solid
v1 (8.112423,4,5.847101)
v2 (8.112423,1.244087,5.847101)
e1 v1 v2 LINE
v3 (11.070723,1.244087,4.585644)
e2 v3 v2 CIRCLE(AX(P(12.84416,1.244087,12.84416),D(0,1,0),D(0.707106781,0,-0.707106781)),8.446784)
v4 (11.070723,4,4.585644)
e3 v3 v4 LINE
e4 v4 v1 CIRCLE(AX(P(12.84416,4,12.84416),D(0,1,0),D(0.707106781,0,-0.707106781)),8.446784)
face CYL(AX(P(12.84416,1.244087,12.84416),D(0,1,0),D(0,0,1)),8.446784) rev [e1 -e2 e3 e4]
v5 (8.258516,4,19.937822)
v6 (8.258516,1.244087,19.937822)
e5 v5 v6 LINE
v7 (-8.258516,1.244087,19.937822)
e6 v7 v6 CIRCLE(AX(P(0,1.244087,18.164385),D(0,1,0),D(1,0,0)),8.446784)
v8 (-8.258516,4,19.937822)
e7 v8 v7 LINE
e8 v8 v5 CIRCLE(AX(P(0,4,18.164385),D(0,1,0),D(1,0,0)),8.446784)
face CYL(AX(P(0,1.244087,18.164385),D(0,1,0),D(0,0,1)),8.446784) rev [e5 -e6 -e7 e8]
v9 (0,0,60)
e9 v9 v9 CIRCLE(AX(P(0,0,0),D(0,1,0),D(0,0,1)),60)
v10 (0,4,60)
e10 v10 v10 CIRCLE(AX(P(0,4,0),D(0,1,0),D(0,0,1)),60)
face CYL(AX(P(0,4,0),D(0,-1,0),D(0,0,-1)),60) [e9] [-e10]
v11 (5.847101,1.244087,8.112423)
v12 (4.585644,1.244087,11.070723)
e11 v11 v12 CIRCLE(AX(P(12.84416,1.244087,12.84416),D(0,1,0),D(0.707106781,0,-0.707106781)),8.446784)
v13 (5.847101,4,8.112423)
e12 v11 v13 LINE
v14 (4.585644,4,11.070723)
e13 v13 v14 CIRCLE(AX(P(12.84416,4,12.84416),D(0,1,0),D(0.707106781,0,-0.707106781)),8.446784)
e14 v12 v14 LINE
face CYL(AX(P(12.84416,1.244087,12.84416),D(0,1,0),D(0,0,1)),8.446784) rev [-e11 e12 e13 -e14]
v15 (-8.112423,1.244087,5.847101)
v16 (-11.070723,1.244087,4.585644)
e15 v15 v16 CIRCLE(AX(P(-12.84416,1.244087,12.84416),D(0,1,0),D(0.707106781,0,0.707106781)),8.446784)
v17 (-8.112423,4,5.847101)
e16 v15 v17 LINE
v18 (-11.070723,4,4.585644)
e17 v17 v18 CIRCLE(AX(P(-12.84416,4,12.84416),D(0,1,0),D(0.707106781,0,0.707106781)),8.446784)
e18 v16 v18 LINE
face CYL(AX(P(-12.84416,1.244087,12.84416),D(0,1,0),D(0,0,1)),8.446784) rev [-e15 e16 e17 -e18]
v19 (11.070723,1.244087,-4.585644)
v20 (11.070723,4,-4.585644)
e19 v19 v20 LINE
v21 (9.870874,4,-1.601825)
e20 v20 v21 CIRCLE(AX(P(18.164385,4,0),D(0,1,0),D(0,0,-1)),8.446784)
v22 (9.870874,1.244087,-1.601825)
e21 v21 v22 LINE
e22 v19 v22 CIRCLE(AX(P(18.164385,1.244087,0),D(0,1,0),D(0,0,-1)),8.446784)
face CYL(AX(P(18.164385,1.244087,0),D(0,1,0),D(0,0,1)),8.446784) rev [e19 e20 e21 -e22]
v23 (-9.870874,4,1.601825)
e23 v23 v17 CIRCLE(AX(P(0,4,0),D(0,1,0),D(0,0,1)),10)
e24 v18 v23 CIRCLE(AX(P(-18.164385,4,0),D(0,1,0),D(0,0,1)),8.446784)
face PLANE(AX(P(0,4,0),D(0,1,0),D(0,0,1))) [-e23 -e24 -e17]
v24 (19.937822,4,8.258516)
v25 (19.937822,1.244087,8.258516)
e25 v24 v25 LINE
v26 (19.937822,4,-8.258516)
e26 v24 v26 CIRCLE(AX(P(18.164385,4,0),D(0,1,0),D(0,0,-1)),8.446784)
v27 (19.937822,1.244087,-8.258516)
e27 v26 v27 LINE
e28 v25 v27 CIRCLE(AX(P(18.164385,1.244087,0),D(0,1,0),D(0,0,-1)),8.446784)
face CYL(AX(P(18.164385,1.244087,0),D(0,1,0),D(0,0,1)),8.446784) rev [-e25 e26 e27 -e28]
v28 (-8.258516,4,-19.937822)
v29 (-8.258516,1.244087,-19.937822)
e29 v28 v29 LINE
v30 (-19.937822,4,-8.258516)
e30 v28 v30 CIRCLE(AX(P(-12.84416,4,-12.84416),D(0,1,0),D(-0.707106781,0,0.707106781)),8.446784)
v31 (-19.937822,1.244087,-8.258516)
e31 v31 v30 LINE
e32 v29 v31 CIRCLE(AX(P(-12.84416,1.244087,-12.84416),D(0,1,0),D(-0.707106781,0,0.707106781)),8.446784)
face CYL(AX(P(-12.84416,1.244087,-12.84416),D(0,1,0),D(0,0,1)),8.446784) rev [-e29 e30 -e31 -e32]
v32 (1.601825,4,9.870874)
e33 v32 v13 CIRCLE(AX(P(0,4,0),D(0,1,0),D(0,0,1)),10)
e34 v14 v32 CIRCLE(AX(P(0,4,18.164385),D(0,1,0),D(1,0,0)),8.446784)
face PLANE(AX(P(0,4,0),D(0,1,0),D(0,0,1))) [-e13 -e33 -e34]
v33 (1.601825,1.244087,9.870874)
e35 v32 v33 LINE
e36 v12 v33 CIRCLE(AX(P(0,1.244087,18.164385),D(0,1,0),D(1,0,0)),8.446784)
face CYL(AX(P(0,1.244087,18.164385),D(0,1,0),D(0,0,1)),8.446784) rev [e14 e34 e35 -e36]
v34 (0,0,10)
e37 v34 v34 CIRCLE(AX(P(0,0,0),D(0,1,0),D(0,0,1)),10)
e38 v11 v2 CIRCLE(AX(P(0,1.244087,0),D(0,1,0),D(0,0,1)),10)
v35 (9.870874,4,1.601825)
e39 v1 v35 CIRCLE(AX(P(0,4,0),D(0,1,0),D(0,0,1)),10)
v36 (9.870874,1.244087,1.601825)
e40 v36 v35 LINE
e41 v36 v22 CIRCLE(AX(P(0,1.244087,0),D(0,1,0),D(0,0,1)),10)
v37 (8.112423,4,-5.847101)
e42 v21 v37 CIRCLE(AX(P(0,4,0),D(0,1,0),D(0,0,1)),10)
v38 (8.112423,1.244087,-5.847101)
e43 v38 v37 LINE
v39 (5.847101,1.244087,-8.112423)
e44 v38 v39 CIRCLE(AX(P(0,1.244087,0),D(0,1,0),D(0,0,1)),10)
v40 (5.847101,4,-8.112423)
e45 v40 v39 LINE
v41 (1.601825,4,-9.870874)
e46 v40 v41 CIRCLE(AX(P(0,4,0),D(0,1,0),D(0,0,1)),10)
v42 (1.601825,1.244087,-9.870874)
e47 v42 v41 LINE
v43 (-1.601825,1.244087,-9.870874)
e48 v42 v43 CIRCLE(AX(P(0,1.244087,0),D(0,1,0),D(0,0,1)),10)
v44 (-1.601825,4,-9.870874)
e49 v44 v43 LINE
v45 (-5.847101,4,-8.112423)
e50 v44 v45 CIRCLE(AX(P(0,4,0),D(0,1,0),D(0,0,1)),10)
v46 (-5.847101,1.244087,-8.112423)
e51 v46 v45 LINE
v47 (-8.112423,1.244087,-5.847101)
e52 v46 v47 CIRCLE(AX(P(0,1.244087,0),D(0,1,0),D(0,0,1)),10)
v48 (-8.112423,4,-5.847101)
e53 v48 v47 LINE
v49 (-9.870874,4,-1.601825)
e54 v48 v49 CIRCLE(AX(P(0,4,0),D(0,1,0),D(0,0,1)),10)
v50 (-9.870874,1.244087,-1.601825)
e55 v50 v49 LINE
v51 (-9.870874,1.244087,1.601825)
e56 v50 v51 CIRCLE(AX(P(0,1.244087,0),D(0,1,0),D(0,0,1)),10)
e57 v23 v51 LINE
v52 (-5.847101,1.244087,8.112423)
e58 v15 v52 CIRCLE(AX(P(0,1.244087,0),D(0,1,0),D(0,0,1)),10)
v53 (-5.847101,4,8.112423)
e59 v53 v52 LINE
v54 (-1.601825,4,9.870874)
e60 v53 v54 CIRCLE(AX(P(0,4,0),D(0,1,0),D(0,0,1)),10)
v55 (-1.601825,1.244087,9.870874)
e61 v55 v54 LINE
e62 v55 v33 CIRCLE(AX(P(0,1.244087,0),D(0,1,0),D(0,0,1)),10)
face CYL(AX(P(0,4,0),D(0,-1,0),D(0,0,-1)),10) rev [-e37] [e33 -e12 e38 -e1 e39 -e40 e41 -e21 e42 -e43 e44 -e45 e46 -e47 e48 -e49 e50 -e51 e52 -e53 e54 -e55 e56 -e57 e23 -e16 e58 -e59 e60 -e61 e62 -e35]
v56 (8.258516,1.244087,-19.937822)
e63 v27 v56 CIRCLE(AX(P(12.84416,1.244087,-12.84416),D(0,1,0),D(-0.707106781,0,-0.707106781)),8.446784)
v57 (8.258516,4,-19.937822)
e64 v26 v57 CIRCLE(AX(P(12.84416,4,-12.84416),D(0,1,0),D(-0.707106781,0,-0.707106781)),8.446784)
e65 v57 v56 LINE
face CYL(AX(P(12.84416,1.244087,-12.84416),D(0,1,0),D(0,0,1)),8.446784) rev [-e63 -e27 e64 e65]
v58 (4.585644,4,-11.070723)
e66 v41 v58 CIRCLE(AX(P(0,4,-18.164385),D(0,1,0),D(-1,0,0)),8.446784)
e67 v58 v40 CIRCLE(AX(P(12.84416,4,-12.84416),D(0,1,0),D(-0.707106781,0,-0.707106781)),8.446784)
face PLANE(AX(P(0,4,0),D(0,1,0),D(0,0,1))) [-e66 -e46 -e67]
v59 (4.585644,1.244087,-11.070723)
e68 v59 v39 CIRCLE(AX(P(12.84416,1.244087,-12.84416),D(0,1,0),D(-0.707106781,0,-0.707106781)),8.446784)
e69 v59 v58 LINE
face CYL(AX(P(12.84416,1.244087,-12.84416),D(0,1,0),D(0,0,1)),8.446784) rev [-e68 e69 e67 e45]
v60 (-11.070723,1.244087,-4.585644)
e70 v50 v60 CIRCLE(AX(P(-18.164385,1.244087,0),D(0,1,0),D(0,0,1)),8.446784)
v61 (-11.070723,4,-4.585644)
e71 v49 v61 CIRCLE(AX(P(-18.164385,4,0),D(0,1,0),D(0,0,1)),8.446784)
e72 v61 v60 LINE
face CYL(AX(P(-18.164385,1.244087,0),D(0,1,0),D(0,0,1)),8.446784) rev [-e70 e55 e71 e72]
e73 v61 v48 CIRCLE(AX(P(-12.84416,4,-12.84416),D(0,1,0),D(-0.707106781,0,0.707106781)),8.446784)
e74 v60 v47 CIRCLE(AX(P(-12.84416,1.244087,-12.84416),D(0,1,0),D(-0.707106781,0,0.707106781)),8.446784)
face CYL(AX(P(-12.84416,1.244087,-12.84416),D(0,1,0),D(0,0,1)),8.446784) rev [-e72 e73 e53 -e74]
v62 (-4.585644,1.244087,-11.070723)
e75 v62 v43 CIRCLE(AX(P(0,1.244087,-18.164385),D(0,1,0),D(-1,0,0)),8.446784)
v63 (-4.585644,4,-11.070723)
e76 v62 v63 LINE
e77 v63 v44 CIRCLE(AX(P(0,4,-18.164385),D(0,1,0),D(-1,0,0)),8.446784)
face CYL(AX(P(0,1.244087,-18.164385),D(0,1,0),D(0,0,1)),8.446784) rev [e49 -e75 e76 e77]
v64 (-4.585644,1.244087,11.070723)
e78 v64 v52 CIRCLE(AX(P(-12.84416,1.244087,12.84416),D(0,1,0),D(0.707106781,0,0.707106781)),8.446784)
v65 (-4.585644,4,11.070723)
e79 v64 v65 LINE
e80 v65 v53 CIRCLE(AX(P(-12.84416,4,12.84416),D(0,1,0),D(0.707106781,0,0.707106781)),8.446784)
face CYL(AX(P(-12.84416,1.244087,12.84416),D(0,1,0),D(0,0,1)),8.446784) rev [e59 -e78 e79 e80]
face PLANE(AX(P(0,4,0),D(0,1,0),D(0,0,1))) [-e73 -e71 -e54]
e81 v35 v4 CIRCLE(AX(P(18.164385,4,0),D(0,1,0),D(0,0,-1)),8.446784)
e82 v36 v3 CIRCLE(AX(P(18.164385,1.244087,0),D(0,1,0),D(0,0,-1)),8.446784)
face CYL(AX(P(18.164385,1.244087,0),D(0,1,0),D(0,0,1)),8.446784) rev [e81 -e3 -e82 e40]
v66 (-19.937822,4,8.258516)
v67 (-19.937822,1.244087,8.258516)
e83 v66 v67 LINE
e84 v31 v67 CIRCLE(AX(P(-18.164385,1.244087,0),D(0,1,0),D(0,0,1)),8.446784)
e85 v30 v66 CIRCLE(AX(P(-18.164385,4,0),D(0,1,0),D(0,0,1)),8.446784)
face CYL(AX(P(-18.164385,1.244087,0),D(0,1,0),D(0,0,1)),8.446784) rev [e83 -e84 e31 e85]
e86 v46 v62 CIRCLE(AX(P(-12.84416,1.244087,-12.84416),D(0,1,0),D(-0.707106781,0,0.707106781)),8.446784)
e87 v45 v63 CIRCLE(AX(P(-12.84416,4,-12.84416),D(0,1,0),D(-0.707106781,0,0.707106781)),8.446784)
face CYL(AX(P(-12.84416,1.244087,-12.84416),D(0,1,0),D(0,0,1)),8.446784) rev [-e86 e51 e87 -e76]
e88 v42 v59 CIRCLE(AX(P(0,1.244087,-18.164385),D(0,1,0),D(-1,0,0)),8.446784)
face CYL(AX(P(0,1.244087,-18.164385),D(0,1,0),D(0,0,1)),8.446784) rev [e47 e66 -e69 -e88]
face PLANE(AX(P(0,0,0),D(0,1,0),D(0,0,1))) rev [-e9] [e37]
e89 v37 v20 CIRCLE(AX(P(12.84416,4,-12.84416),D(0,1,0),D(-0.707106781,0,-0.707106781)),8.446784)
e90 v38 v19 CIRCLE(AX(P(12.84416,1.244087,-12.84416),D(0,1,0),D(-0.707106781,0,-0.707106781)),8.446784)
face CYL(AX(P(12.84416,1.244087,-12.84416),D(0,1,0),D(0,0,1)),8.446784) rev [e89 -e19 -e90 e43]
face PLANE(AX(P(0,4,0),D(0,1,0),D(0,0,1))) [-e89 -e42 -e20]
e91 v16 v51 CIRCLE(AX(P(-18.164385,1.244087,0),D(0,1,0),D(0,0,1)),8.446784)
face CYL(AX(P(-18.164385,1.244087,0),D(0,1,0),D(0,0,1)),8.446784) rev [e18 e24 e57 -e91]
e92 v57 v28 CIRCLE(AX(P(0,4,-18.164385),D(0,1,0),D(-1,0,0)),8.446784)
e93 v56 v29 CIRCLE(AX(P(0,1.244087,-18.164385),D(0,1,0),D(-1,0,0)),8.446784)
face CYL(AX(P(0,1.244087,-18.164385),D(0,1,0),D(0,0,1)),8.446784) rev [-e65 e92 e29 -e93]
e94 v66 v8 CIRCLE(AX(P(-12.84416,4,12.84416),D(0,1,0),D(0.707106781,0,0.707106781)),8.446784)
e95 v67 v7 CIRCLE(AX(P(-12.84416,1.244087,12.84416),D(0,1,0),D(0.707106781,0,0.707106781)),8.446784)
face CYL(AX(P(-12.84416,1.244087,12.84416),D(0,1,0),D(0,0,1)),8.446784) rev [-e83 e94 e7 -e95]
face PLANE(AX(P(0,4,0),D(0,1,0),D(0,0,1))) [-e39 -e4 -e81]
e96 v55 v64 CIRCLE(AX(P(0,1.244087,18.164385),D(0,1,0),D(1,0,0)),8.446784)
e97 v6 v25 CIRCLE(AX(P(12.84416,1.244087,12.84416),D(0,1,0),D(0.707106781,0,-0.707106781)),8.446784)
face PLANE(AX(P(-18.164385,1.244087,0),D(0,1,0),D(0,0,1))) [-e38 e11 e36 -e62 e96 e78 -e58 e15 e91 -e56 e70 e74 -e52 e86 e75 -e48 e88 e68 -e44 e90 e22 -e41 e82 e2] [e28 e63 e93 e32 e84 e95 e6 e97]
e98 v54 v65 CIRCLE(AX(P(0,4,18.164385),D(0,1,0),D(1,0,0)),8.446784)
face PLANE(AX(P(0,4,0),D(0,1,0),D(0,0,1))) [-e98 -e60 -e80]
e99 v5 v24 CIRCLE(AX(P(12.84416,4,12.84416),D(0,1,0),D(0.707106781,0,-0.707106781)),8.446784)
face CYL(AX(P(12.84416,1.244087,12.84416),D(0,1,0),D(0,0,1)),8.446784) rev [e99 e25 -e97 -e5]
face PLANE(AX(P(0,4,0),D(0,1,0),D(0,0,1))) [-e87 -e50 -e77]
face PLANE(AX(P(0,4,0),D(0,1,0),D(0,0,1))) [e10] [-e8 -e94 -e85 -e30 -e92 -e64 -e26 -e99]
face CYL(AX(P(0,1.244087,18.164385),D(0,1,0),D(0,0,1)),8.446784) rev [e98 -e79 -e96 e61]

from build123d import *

# Parameters (mm, degrees)
SKETCH1_R           = 60
BOSS_EXTRUDE1_DEPTH = 4
SKETCH2_R           = 10
CUT_EXTRUDE1_DEPTH  = 85.947042326
SKETCH3_R           = 8.446784488
CUT_EXTRUDE2_DEPTH  = 2.755912844
CIRPATTERN1_COUNT   = 8


with BuildPart() as part:
    # Sketch1 → Boss-Extrude1 (new body)
    with BuildSketch(Plane(origin=(0, 0, 0), x_dir=(1, 0, 0), z_dir=(0, 1, 0))):
        Circle(SKETCH1_R)
    extrude(amount=BOSS_EXTRUDE1_DEPTH)

    # Sketch2 → Cut-Extrude1 (cut, through all)
    with BuildSketch(Plane(origin=(0, 0, 0), x_dir=(1, 0, 0), z_dir=(0, 1, 0))):
        Circle(SKETCH2_R)
    extrude(amount=CUT_EXTRUDE1_DEPTH, mode=Mode.SUBTRACT)

    # Sketch3 → Cut-Extrude2 (cut)
    with BuildSketch(Plane(origin=(0, 4, 0), x_dir=(1, 0, 0), z_dir=(0, 1, 0))):
        with Locations((-18.16438515, 0)):
            Circle(SKETCH3_R)
    cut_extrude2 = extrude(amount=-CUT_EXTRUDE2_DEPTH, mode=Mode.SUBTRACT)

    # CirPattern1: Cut-Extrude2 ×8 about axis
    cirpattern1_axis = Axis((0, 0, 0), (0, 1, 0))
    for i in range(1, CIRPATTERN1_COUNT):
        add(cut_extrude2.rotate(cirpattern1_axis, i * 360 / CIRPATTERN1_COUNT), mode=Mode.SUBTRACT)


solid = part.part
